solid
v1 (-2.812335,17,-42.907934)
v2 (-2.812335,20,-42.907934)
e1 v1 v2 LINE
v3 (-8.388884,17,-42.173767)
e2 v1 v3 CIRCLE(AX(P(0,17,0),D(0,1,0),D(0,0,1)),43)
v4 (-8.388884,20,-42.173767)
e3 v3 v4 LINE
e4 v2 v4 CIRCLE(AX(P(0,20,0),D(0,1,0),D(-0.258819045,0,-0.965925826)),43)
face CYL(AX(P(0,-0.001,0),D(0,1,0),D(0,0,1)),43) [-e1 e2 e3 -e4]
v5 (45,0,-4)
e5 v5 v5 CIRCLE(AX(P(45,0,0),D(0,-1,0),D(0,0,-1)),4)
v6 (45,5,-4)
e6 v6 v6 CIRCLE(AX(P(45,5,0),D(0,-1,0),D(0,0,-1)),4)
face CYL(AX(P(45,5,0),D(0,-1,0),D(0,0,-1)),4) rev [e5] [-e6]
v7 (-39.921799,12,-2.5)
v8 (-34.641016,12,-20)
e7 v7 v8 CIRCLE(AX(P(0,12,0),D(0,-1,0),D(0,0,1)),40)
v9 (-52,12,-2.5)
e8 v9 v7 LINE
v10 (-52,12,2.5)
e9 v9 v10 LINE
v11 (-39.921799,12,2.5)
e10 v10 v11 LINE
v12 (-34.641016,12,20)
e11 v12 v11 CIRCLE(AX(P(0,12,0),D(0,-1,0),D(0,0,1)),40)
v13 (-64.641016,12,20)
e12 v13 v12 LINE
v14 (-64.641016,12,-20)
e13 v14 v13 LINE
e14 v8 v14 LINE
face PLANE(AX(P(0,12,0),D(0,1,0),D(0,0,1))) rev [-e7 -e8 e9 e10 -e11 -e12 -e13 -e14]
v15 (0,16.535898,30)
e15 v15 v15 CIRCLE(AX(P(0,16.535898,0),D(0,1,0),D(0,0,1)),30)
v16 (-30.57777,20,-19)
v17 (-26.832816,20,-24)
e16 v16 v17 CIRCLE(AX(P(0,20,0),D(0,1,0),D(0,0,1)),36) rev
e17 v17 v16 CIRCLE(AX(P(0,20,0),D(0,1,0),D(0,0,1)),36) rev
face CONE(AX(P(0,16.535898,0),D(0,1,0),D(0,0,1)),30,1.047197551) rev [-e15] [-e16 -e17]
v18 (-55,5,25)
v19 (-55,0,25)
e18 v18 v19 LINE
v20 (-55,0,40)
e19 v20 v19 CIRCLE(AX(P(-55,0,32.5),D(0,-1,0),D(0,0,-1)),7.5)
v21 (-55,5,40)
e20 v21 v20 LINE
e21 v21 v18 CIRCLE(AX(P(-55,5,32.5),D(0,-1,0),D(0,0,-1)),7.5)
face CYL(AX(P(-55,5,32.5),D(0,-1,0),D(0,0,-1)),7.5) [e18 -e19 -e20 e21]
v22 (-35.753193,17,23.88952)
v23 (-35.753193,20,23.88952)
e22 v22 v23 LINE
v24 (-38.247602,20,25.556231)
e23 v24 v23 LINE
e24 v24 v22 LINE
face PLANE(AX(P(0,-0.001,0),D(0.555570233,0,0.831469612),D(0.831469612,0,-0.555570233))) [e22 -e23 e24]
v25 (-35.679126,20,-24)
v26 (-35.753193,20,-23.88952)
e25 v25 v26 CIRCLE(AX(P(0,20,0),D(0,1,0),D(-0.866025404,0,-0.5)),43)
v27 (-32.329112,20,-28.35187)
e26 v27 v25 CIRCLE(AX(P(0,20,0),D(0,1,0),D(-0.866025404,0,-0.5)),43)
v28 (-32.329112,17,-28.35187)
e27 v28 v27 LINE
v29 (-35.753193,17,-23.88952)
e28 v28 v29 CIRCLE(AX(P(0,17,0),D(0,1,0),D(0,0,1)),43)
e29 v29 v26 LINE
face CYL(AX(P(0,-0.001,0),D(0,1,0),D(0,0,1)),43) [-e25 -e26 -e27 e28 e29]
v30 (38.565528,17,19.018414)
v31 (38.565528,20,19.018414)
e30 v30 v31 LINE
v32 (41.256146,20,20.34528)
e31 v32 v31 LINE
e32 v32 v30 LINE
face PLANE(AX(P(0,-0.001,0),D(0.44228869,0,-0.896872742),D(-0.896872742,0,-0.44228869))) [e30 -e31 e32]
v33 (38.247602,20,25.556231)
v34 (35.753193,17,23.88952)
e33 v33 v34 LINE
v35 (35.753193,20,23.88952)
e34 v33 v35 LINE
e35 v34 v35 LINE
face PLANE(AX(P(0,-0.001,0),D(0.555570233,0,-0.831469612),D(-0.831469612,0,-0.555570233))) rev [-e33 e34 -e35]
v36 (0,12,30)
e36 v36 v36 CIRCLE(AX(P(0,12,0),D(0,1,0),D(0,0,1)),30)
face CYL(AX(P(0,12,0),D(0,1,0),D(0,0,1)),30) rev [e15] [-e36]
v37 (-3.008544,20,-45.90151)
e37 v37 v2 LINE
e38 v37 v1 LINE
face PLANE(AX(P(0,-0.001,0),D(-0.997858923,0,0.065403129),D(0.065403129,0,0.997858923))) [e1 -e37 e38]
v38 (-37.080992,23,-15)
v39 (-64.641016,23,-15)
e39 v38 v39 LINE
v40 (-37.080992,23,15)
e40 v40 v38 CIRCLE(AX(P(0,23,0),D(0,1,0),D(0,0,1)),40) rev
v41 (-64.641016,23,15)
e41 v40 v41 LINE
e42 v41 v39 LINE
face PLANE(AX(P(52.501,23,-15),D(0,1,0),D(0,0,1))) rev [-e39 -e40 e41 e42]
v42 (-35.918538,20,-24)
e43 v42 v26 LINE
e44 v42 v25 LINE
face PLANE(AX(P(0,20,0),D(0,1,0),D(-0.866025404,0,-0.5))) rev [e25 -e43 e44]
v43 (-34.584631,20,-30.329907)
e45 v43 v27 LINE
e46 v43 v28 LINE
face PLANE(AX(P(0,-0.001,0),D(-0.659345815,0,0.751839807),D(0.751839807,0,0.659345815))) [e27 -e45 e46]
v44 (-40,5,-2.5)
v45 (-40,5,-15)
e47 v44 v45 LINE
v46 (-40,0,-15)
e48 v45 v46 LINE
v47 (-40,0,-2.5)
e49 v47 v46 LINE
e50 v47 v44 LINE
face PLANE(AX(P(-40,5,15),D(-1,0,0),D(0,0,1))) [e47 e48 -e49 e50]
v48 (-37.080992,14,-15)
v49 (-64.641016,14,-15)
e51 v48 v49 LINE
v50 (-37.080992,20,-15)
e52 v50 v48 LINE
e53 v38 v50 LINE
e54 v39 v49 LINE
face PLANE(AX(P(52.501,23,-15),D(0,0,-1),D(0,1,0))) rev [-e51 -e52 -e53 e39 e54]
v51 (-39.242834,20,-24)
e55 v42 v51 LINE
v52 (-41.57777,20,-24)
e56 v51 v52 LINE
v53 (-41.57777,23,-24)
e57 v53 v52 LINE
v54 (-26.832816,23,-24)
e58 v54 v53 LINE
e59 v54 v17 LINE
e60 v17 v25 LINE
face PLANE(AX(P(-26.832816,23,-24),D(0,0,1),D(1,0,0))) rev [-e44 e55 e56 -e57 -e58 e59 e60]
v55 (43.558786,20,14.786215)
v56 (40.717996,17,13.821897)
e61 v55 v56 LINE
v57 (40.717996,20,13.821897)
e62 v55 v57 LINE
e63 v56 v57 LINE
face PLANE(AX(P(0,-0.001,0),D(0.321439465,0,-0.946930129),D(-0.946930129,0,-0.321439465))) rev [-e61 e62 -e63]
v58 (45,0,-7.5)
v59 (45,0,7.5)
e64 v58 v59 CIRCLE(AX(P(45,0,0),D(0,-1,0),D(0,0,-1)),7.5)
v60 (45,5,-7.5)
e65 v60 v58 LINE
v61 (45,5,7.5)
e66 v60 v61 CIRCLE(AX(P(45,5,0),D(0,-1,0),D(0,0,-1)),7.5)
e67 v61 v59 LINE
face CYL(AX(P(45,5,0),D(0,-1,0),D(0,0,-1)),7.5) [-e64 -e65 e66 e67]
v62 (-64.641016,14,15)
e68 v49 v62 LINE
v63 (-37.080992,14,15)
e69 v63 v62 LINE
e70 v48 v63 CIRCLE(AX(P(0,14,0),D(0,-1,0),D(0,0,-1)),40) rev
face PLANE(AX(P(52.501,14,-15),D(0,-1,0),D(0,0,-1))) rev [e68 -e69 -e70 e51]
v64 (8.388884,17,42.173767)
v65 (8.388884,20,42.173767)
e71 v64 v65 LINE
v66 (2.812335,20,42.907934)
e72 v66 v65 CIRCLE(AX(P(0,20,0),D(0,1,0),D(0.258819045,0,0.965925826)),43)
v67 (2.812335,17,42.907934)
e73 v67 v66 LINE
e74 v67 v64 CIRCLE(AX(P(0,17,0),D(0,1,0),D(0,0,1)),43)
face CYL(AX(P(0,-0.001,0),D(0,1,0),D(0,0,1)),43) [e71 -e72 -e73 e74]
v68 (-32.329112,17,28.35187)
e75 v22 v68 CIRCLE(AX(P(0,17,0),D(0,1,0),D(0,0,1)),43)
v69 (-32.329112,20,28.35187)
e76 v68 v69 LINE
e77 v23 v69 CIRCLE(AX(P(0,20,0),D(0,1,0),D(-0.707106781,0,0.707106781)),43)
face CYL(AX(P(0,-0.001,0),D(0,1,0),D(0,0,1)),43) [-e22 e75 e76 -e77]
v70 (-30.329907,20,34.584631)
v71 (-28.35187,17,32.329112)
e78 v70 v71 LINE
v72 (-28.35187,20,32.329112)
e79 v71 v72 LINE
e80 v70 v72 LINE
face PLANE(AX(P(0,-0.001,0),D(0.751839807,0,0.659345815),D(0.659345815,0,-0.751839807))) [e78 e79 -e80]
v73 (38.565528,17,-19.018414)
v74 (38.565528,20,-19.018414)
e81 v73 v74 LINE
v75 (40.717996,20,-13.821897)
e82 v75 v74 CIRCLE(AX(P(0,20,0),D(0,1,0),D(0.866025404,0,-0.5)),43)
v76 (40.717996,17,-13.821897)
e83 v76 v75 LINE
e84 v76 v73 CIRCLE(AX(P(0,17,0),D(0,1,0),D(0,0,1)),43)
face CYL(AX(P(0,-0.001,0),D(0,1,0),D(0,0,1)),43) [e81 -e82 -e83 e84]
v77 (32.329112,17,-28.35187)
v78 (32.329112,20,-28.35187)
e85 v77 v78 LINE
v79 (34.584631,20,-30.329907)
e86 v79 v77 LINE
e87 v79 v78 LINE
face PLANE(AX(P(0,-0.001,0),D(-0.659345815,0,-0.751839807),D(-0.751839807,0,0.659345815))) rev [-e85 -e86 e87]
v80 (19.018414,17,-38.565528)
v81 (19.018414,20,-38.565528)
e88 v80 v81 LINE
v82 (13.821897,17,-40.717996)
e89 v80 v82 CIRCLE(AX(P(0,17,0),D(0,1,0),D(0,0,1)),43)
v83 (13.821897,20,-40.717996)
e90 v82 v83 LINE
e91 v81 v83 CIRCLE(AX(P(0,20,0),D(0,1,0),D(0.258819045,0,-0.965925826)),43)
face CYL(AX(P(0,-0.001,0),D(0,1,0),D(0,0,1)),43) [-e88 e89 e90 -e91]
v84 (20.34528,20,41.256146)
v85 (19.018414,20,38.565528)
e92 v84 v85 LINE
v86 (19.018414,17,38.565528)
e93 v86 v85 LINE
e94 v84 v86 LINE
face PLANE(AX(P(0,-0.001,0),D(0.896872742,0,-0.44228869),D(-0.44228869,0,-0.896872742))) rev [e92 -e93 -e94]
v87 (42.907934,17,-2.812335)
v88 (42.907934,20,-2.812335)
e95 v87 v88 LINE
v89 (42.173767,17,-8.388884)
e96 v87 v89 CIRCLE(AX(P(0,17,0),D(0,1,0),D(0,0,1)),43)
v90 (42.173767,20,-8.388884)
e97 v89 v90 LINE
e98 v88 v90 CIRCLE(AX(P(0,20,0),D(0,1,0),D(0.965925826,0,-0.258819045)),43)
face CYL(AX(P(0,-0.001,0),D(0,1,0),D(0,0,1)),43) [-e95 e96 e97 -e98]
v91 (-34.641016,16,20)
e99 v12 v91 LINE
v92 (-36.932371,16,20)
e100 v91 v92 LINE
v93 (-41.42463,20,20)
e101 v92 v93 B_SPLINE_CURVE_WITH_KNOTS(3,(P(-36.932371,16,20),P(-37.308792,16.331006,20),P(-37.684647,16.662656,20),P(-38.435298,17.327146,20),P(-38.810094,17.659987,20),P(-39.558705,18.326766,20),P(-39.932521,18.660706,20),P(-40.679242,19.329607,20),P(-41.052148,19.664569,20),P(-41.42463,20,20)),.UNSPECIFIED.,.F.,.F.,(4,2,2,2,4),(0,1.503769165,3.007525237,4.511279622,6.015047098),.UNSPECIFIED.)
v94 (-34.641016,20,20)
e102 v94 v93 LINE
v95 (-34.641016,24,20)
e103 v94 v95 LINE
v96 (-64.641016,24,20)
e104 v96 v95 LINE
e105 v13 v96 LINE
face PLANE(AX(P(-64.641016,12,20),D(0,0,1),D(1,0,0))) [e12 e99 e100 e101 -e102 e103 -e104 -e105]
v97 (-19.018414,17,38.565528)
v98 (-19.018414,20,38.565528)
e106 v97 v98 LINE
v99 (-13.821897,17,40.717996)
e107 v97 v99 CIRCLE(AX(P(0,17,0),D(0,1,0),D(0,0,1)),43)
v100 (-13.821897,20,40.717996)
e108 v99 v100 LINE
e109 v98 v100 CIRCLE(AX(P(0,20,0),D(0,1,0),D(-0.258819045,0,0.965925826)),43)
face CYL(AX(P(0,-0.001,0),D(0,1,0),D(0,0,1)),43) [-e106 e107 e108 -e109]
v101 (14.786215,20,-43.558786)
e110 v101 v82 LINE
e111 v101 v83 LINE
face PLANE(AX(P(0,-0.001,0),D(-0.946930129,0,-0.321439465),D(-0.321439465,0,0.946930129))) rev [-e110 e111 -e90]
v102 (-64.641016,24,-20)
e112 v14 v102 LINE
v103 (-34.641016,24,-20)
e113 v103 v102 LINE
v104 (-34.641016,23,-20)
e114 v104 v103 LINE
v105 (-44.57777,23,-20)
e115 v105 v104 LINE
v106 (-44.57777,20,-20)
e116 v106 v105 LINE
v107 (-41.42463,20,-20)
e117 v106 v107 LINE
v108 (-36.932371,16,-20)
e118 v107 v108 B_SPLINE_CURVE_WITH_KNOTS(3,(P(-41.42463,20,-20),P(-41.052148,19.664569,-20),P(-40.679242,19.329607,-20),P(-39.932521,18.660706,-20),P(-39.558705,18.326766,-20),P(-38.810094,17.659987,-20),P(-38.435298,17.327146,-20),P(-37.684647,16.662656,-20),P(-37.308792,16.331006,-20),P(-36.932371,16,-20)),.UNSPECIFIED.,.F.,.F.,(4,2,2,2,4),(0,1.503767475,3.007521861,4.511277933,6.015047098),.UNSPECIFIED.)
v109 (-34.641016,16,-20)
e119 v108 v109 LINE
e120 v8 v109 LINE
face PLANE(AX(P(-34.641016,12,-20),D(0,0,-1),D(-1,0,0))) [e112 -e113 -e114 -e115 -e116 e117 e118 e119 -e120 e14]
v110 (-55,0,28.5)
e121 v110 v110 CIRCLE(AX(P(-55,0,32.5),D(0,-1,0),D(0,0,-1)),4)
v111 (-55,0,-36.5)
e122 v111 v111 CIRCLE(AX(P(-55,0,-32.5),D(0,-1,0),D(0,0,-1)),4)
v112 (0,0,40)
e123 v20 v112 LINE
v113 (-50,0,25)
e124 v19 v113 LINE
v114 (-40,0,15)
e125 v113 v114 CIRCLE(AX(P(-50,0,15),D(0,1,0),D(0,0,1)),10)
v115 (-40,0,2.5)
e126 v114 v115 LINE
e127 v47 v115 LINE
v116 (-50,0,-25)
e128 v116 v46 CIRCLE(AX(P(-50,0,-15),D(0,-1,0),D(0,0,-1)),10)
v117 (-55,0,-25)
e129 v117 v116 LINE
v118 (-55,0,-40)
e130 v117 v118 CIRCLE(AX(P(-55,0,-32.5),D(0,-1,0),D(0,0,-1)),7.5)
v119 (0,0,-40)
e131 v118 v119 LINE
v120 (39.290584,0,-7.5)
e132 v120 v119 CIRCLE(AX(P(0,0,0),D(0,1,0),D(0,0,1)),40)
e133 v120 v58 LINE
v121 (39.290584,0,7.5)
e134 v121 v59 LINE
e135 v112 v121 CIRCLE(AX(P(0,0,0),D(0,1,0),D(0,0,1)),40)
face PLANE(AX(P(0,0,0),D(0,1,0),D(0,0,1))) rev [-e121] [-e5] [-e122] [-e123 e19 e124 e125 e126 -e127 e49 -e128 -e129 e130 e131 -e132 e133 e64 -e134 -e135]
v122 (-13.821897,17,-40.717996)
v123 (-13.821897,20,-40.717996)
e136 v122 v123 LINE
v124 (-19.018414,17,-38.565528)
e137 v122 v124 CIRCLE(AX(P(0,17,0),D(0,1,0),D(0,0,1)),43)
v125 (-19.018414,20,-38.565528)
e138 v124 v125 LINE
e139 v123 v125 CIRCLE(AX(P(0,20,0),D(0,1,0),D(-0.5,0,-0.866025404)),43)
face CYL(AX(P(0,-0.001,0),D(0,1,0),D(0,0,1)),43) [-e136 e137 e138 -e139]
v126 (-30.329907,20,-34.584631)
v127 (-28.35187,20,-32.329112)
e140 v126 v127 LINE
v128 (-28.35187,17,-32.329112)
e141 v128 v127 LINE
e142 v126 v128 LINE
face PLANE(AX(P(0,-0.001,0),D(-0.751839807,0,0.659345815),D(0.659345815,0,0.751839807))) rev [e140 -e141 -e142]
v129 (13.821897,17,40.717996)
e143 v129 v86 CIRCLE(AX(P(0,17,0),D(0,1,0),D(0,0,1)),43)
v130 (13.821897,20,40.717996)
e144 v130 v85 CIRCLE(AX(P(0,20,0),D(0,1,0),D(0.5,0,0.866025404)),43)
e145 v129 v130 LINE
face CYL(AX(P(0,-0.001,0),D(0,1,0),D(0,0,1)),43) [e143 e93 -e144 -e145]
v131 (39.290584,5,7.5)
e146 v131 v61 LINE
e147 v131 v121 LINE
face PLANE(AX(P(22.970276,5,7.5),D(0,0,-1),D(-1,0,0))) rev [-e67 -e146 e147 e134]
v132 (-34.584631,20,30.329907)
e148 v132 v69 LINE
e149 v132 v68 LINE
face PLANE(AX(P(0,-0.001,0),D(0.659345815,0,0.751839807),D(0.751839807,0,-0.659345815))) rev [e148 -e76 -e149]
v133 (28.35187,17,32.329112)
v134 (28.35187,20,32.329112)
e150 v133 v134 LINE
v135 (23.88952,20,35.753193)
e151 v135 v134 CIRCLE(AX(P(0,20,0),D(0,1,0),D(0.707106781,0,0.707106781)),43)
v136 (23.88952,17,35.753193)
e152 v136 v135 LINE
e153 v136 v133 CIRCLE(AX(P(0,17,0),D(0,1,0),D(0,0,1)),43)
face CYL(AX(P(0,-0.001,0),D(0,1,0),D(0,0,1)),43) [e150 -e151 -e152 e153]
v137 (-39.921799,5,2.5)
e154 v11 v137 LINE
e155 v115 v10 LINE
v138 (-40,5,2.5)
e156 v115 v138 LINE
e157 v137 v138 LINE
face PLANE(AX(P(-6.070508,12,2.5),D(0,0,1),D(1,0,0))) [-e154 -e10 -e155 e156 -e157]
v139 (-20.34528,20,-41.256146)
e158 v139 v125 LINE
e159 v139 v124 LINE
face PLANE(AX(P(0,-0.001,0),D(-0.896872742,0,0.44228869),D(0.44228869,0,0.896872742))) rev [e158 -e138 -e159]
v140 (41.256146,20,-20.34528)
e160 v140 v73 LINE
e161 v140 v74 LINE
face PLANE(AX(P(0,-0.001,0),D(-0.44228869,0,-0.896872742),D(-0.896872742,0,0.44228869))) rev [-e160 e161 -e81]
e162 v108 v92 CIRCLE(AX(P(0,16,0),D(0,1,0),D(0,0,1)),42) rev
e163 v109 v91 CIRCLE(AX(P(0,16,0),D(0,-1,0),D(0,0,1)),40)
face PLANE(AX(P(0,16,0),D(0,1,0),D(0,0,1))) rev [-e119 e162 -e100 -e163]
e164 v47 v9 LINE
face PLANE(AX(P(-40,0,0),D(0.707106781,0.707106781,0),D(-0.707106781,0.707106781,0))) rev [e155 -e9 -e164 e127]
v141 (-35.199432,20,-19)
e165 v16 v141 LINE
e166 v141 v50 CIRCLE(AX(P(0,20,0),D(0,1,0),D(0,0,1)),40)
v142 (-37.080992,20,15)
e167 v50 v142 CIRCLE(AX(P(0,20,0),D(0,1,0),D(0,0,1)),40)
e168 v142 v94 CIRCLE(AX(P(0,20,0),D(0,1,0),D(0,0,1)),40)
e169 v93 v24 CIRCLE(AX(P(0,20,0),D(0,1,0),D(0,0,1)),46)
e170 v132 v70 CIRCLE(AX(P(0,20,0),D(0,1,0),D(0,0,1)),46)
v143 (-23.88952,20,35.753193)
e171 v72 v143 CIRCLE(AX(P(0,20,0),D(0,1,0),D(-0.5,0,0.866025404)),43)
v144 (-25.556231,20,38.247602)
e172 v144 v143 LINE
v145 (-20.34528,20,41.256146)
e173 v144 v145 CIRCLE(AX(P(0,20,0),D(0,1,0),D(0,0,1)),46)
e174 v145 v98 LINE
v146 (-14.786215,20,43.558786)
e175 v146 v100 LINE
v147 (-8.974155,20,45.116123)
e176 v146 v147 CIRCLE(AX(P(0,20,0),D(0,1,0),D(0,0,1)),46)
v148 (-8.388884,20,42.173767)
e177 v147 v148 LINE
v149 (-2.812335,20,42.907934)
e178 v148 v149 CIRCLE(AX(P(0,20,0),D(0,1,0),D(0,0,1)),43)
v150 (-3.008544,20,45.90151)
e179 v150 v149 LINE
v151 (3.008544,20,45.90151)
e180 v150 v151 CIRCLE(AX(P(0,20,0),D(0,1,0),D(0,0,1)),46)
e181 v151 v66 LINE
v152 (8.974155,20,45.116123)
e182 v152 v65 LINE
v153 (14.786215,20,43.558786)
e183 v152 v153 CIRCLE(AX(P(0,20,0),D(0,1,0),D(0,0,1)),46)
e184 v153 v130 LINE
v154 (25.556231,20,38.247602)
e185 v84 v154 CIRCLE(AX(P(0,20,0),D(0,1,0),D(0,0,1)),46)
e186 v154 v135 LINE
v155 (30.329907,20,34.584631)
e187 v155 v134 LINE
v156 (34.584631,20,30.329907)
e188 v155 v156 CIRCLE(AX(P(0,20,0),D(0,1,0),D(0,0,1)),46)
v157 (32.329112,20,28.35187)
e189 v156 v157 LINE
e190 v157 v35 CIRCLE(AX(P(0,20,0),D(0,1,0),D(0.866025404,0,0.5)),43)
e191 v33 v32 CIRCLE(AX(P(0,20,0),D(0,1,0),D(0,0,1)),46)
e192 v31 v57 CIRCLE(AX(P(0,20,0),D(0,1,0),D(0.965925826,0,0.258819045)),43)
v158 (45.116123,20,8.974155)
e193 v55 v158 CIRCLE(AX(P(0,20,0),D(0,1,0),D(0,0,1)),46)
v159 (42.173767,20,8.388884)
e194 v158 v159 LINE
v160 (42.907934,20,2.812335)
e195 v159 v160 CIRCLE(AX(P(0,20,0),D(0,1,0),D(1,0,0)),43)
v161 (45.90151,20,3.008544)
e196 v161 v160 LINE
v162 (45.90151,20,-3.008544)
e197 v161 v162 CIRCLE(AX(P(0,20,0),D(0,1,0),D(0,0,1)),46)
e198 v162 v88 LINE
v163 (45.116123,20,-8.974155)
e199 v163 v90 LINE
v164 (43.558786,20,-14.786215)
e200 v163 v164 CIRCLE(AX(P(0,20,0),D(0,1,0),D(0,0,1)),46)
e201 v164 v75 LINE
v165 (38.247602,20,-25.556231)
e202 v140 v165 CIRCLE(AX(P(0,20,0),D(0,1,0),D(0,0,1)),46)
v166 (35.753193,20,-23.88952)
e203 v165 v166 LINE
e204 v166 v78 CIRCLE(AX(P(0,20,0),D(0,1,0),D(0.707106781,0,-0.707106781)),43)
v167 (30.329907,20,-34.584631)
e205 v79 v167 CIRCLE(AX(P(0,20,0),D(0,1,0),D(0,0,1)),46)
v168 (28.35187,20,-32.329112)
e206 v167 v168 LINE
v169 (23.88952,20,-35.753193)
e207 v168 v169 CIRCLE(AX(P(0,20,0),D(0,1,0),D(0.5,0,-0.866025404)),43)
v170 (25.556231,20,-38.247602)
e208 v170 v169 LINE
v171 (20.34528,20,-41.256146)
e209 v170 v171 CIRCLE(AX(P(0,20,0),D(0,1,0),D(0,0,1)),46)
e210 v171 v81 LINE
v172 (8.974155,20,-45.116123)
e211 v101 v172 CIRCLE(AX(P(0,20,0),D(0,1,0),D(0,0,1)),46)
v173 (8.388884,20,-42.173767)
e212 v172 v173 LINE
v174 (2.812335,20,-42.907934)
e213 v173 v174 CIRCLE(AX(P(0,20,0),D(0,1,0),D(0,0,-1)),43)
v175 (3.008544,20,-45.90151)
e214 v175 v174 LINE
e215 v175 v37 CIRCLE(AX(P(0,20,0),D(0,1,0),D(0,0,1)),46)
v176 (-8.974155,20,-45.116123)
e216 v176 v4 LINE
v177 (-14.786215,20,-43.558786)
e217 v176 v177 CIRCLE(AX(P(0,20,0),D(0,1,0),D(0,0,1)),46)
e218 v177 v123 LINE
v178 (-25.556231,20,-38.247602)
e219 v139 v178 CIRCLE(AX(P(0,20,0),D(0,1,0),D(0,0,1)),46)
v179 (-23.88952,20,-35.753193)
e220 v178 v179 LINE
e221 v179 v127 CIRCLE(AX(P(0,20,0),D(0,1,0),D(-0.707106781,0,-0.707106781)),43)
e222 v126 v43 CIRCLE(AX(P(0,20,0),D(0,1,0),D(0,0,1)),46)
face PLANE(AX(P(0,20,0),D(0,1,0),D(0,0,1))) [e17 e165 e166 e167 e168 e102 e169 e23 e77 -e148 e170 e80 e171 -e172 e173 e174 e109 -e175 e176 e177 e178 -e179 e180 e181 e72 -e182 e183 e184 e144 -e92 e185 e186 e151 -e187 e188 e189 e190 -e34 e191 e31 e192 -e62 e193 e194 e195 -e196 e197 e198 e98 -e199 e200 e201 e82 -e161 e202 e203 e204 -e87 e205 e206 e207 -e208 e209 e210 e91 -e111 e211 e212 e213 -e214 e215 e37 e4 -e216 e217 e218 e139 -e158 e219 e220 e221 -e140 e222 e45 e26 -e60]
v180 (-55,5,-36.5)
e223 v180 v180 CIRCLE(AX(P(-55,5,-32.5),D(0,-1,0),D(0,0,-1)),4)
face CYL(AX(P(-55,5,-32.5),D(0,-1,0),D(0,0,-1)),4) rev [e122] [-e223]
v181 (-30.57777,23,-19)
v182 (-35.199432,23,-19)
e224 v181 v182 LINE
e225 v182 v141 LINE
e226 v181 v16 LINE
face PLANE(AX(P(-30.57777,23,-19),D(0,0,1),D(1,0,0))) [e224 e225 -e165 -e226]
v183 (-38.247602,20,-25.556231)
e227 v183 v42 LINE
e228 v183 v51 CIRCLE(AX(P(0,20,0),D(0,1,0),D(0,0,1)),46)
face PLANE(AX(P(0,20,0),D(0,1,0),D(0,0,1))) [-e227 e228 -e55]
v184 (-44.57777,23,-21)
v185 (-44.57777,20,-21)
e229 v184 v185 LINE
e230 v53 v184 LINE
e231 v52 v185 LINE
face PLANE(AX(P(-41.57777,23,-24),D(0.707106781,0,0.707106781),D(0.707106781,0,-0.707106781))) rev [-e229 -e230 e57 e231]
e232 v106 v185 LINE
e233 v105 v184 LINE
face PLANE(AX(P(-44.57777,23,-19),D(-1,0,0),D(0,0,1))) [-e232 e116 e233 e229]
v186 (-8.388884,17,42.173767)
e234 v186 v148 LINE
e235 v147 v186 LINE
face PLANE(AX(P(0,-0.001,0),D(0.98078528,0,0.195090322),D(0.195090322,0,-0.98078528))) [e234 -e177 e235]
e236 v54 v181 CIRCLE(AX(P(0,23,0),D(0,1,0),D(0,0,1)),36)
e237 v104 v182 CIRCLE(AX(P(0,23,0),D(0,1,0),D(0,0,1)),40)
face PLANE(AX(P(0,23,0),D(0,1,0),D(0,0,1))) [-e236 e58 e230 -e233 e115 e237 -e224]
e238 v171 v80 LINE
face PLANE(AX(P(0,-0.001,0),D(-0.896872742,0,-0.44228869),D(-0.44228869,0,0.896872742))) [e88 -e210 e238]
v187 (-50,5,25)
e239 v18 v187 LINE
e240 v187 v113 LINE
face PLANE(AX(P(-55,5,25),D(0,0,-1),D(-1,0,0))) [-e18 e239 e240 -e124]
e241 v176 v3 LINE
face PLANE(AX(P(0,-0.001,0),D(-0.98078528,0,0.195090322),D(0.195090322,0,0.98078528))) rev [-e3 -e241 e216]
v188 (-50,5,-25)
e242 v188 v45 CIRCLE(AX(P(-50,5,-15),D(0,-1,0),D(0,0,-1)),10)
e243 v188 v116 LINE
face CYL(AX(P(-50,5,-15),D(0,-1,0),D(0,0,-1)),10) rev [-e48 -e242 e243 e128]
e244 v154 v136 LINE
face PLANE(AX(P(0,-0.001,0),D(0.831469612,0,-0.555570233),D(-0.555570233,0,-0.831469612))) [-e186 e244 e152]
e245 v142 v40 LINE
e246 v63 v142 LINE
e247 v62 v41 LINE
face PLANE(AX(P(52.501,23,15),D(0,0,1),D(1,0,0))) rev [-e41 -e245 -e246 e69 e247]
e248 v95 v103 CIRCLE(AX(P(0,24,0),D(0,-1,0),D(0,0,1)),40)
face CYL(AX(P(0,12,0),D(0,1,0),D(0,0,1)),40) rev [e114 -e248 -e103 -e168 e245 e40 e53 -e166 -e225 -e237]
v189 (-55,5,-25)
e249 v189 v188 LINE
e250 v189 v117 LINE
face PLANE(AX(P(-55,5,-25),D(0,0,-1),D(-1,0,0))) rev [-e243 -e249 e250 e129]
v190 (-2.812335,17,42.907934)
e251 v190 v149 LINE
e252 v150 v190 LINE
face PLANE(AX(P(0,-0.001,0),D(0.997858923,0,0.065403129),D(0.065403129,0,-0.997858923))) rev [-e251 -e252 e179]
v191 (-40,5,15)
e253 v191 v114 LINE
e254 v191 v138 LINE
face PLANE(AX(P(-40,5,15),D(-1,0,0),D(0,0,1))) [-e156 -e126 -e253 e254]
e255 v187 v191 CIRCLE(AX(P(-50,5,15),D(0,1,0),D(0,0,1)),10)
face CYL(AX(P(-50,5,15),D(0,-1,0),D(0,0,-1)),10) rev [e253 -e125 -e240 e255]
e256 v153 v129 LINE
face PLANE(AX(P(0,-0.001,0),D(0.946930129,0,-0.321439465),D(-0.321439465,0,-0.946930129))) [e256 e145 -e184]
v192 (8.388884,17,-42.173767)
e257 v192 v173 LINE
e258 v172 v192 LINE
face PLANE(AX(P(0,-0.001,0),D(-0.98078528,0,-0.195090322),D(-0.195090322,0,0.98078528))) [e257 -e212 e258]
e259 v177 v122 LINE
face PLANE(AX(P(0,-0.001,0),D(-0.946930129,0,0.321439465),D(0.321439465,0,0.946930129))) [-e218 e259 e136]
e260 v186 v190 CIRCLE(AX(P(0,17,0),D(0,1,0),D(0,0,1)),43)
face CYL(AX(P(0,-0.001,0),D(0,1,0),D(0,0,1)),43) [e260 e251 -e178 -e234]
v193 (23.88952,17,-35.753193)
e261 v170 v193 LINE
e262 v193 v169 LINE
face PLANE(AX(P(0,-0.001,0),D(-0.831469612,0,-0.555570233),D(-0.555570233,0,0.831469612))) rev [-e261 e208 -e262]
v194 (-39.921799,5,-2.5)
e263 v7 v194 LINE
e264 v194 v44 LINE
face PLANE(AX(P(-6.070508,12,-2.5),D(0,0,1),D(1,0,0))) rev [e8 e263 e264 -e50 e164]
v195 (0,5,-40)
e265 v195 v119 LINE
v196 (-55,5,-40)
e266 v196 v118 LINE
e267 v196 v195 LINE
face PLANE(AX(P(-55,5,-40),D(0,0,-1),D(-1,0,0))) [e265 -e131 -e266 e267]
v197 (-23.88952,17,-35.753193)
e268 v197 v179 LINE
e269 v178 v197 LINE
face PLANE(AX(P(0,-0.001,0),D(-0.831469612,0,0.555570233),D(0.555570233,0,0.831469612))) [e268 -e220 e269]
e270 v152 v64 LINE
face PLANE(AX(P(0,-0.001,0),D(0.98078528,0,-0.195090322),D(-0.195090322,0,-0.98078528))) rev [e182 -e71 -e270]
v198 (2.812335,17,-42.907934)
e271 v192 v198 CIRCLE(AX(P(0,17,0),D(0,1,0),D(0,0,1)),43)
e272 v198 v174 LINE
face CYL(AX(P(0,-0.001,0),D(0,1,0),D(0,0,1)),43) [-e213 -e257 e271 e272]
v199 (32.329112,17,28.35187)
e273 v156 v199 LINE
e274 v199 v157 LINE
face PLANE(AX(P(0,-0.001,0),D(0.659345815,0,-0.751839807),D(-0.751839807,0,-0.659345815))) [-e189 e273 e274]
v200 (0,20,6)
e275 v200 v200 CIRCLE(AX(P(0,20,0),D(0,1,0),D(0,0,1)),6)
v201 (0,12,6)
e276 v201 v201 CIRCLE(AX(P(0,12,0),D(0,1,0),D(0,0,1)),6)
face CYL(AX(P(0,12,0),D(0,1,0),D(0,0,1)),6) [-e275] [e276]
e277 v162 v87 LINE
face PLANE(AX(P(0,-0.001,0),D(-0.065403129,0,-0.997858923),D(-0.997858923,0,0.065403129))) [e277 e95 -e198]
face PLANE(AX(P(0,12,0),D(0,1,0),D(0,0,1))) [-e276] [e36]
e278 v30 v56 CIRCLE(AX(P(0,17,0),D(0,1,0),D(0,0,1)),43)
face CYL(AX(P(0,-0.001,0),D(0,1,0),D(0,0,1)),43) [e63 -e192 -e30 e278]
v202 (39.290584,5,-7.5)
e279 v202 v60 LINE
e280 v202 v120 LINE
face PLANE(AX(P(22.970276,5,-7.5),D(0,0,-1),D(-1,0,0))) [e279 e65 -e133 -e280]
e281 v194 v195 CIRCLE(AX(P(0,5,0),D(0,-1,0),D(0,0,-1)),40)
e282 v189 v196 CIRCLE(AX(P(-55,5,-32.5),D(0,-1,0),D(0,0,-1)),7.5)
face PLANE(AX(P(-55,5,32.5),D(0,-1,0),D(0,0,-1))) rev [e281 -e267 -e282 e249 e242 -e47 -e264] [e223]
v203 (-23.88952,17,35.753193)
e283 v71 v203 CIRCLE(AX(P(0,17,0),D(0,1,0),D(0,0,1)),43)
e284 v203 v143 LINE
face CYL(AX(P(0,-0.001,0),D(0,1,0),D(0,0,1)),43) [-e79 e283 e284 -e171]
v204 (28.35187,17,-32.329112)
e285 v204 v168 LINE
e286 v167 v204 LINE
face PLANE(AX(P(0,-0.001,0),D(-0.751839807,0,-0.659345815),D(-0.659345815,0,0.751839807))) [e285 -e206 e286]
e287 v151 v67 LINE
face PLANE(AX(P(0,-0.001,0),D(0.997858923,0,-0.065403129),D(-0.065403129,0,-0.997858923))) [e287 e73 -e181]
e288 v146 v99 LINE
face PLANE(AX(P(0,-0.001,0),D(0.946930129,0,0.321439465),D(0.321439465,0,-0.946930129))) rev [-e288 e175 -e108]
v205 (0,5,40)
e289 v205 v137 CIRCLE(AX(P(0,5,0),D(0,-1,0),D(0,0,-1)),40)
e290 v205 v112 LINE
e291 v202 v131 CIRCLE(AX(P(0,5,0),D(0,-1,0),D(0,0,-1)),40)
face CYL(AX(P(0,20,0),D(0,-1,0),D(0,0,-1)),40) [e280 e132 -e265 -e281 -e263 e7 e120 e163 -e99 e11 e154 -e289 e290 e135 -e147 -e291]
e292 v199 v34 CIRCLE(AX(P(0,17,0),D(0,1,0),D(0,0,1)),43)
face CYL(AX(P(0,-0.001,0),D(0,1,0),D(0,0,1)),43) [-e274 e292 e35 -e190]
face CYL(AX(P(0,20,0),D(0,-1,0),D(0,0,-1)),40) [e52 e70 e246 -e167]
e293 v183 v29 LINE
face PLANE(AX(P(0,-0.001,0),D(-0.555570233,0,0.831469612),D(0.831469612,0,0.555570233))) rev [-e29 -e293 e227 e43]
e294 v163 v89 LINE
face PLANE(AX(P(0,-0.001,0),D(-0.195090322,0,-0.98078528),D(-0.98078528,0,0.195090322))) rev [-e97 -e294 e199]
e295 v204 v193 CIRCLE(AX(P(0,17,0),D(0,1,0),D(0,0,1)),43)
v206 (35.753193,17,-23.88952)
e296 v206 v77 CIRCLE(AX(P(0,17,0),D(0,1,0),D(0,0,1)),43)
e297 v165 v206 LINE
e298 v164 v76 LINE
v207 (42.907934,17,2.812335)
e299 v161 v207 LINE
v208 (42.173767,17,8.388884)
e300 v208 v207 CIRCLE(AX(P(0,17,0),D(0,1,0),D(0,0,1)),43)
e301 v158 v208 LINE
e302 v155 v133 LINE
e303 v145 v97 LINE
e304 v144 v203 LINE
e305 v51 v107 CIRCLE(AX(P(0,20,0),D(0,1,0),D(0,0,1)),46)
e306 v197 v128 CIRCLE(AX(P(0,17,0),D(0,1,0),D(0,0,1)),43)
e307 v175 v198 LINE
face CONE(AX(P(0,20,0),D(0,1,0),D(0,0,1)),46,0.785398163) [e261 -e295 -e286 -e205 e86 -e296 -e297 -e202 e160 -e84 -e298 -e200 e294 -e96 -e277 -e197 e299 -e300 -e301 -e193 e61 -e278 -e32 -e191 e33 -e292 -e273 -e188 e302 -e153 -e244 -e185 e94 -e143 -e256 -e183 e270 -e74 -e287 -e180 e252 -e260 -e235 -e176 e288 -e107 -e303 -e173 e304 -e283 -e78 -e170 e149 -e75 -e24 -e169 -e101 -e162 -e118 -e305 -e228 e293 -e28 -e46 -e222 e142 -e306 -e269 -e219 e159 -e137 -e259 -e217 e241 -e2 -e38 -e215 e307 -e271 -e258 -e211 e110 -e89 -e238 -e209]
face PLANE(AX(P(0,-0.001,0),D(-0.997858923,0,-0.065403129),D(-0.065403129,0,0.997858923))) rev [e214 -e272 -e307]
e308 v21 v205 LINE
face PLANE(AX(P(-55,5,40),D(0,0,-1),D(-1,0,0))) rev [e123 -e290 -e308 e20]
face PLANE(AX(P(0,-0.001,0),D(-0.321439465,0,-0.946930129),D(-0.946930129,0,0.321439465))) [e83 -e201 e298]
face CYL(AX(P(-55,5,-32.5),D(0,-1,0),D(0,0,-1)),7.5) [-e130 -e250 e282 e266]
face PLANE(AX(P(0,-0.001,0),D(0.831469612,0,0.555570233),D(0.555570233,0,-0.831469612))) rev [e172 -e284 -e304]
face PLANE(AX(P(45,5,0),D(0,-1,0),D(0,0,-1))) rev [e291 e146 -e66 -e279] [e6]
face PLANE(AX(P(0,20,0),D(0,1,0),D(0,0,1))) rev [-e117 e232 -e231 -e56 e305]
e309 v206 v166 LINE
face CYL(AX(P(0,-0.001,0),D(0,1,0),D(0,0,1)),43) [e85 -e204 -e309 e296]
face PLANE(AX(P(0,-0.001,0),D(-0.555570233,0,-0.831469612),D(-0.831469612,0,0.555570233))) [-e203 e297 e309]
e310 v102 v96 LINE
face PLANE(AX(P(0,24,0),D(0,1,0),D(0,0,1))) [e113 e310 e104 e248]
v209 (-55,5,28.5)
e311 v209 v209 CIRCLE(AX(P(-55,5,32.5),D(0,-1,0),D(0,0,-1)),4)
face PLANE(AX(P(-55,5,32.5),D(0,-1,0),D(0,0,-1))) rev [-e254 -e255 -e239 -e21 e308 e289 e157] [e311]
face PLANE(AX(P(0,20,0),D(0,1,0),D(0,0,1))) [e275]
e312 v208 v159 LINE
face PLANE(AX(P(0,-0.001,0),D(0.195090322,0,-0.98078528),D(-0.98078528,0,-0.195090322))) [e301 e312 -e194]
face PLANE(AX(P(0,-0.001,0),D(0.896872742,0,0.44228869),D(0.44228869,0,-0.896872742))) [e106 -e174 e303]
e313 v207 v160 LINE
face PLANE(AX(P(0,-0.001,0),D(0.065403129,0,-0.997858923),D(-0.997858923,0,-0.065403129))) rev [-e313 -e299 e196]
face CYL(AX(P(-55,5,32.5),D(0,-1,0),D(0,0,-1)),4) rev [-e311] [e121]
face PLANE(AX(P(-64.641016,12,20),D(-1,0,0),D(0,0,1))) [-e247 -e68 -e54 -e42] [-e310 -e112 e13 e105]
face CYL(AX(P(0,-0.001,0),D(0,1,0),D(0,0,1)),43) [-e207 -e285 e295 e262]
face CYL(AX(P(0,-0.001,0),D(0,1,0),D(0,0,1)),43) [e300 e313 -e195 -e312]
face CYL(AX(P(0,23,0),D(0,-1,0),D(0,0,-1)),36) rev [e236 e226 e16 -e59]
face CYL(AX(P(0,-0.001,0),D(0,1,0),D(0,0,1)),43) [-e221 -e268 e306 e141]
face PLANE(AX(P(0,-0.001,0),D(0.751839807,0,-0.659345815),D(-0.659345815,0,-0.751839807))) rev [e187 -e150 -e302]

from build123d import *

# Parameters (mm, degrees)
SKETCH1_R                = 40
BOSS_EXTRUDE1_DEPTH      = 20
SKETCH2_R                = 4
BOSS_EXTRUDE2_DEPTH      = 5
SKETCH3_R                = 30
SKETCH3_R_2              = 6
CUT_EXTRUDE2_DEPTH       = 8
CHAMFER1_SIZE            = 6
CHAMFER1_SIZE2           = 3.464101615
BOSS_EXTRUDE3_DEPTH      = 4
BOSS_EXTRUDE3_DEPTH_BACK = 8
CUT_EXTRUDE3_REACH       = 128.087
CUT_EXTRUDE3_END_RADIUS  = 40
SKETCH7_W                = 30
SKETCH7_H                = 9
RIB1_REACH               = 81.715
SKETCH9_WALL_W           = 178.400308644
SKETCH9_WALL_H           = 5
BOSS_EXTRUDE10_DEPTH     = 3
BOSS_EXTRUDE12_START     = -4
BOSS_EXTRUDE12_DEPTH     = 4
CHAMFER2_SIZE            = 4
CUT_EXTRUDE4_REACH       = 83.82
CIRPATTERN1_START        = 17
CIRPATTERN1_DEPTH        = 3


# Read off the part's stored shape, not the designer's step: CirPattern1
with BuildPart() as part:
    # Sketch1 → Boss-Extrude1 (new body)
    with BuildSketch(Plane(origin=(0, 0, 0), x_dir=(1, 0, 0), z_dir=(0, 1, 0))):
        with Locations(Location((0, 0, 0), (0, 0, 270))):
            Circle(SKETCH1_R)
    extrude(amount=BOSS_EXTRUDE1_DEPTH)

    # Sketch2 → Boss-Extrude2 (add)
    # profile 1 of 2: a face of its own
    with BuildSketch(Plane.XZ):
        with BuildLine():
            Line((-55, 40), (0, 40))
            Line((0, 40), (0, -40))
            Line((0, -40), (-55, -40))
            ThreePointArc((-55, -40), (-62.5, -32.5), (-55, -25))
            Line((-55, -25), (-50, -25))
            ThreePointArc((-50, -25), (-42.928932188, -22.071067812), (-40, -15))
            Line((-40, -15), (-40, 15))
            ThreePointArc((-40, 15), (-42.928932188, 22.071067812), (-50, 25))
            Line((-50, 25), (-55, 25))
            ThreePointArc((-55, 25), (-62.5, 32.5), (-55, 40))
        make_face()
        with Locations(Location((-55, 32.5, 0), (0, 0, 270))):
            Circle(SKETCH2_R, mode=Mode.SUBTRACT)
        with Locations(Location((-55, -32.5, 0), (0, 0, 270))):
            Circle(SKETCH2_R, mode=Mode.SUBTRACT)
    # profile 2 of 2: a face of its own
    with BuildSketch(Plane.XZ):
        with BuildLine():
            Line((22.970276422, 7.5), (45, 7.5))
            ThreePointArc((45, 7.5), (52.5, 0), (45, -7.5))
            Line((45, -7.5), (22.970276422, -7.5))
            Line((22.970276422, -7.5), (22.970276422, 7.5))
        make_face()
        with Locations(Location((45, 0, 0), (0, 0, 270))):
            Circle(SKETCH2_R, mode=Mode.SUBTRACT)
    extrude(amount=-BOSS_EXTRUDE2_DEPTH)

    # Sketch3 → Cut-Extrude2 (cut)
    with BuildSketch(Plane(origin=(0, 20, 0), x_dir=(1, 0, 0), z_dir=(0, 1, 0))):
        with Locations(Location((0, 0, 0), (0, 0, 270))):
            Circle(SKETCH3_R)
        with Locations(Location((0, 0, 0), (0, 0, 270))):
            Circle(SKETCH3_R_2, mode=Mode.SUBTRACT)
    extrude(amount=-CUT_EXTRUDE2_DEPTH, mode=Mode.SUBTRACT)

    # Chamfer1
    chamfer1_edges = [part.edges().sort_by_distance(p)[0] for p in [
        (0, 20, -30),
    ]]
    chamfer1_side = [part.faces().sort_by_distance(p)[0] for p in [
        (0, 20, -38.86862915),
    ]]
    chamfer(chamfer1_edges, length=CHAMFER1_SIZE, length2=CHAMFER1_SIZE2, reference=chamfer1_side[0])

    # Sketch6 → Boss-Extrude3 (add, two sides: drawn at the far end of the back side and taken through both)
    with BuildSketch(Plane(origin=(0, 20, 0), x_dir=(1, 0, 0), z_dir=(0, 1, 0)).offset(-BOSS_EXTRUDE3_DEPTH_BACK)):
        with BuildLine():
            Line((-34.641016151, 20), (-64.641016151, 20))
            Line((-64.641016151, 20), (-64.641016151, -20))
            Line((-64.641016151, -20), (-34.641016151, -20))
            ThreePointArc((-34.641016151, -20), (-40, 0), (-34.641016151, 20))
        make_face()
    extrude(amount=BOSS_EXTRUDE3_DEPTH + BOSS_EXTRUDE3_DEPTH_BACK)

    # Cut-Extrude3: up to this cylinder (the profile starts outside it)
    cut_extrude3_end = Plane(origin=(0, 18.5, 0), z_dir=(0, -1, 0)) * Cylinder(CUT_EXTRUDE3_END_RADIUS, 337.174, mode=Mode.PRIVATE)
    # Sketch7 → Cut-Extrude3 (cut, up to the surface)
    with BuildSketch(Plane.ZY.offset(64.641016151), mode=Mode.PRIVATE) as cut_extrude3_sk1:
        with Locations((0, 18.5)):
            Rectangle(SKETCH7_W, SKETCH7_H)
    cut_extrude3_tool1 = extrude(cut_extrude3_sk1.sketch, amount=-CUT_EXTRUDE3_REACH, mode=Mode.PRIVATE) - cut_extrude3_end
    add(cut_extrude3_tool1.solids().sort_by_distance((-64.641016, 18.5, 0))[0], mode=Mode.SUBTRACT)

    # Sketch9 wall → Rib1 (add, up to next)
    with BuildSketch(Plane(origin=(-46, 6, 0), x_dir=(-0.707106781187, 0.707106781187, 0), z_dir=(-0.707106781187, -0.707106781187, 0)), mode=Mode.PRIVATE) as rib1_sk1:
        Rectangle(SKETCH9_WALL_W, SKETCH9_WALL_H)
    rib1_tool1 = extrude(rib1_sk1.sketch, amount=-RIB1_REACH, mode=Mode.PRIVATE) - part.part
    add(rib1_tool1.solids().sort_by_distance((-46, 6, 0))[0])

    # Sketch13 → Boss-Extrude10 (add)
    with BuildSketch(Plane(origin=(0, 20, 0), x_dir=(1, 0, 0), z_dir=(0, 1, 0))):
        with BuildLine():
            Line((-30.577769703, 19), (-44.577769703, 19))
            Line((-44.577769703, 19), (-44.577769703, 21))
            Line((-44.577769703, 21), (-41.577769703, 24))
            Line((-41.577769703, 24), (-26.83281573, 24))
            ThreePointArc((-26.83281573, 24), (-28.813952001, 21.581384804), (-30.577769703, 19))
        make_face()
    extrude(amount=BOSS_EXTRUDE10_DEPTH)

    # Sketch14 → Boss-Extrude12 (add)
    with BuildSketch(Plane(origin=(0, 20, 0), x_dir=(1, 0, 0), z_dir=(0, 1, 0)).offset(BOSS_EXTRUDE12_START)):
        with BuildLine():
            Line((-34.641016151, 20), (-41.424630354, 20))
            ThreePointArc((-41.424630354, 20), (46, 0), (-41.424630354, -20))
            Line((-41.424630354, -20), (-34.641016151, -20))
            ThreePointArc((-34.641016151, -20), (40, 0), (-34.641016151, 20))
        make_face()
    extrude(amount=BOSS_EXTRUDE12_DEPTH)

    # Chamfer2
    chamfer2_edges = [part.edges().sort_by_distance(p)[0] for p in [
        (46, 16, 0),
    ]]
    chamfer(chamfer2_edges, length=CHAMFER2_SIZE - 0.0001)  # a hair under: the kernel refuses the full size

    # Sketch15 → Cut-Extrude4 (cut, up to next)
    with BuildSketch(Plane(origin=(0, 20, 0), x_dir=(1, 0, 0), z_dir=(0, 1, 0)), mode=Mode.PRIVATE) as cut_extrude4_sk1:
        with BuildLine():
            Line((-8.388883847, -42.173767057), (-8.974154813, -45.116122899))
            ThreePointArc((-8.974154813, -45.116122899), (-6.004204842, -45.606463623), (-3.008543945, -45.901510469))
            Line((-3.008543945, -45.901510469), (-2.812334557, -42.907933699))
            ThreePointArc((-2.812334557, -42.907933699), (-5.612626265, -42.632129039), (-8.388883847, -42.173767057))
        make_face()
    cut_extrude4_tool1 = extrude(cut_extrude4_sk1.sketch, amount=-CUT_EXTRUDE4_REACH, mode=Mode.PRIVATE) & part.part
    add(cut_extrude4_tool1.solids().sort_by_distance((-5.806468, 20, 44.104502))[0], mode=Mode.SUBTRACT)

    # CirPattern1 outline → CirPattern1 (cut)
    with BuildSketch(Plane(origin=(0, 0, 0), x_dir=(1, 0, 0), z_dir=(0, 1, 0)).offset(CIRPATTERN1_START)):
        with BuildLine():
            ThreePointArc((8.388883847, -42.173767057), (5.612626266, -42.632129039), (2.812334557, -42.907933699))
            Line((2.812334557, -42.907933699), (3.008543945, -45.901510469))
            Line((3.008543945, -45.901510469), (3.080542753, -47))
            Line((3.080542753, -47), (9.348881267, -47))
            Line((9.348881267, -47), (8.974154813, -45.116122899))
            Line((8.974154813, -45.116122899), (8.388883847, -42.173767057))
        make_face()
        with BuildLine():
            Line((-23.177835023, -47), (-15.954350166, -47))
            Line((-15.954350166, -47), (-14.786215404, -43.558785957))
            Line((-14.786215404, -43.558785957), (-13.821897008, -40.717995568))
            ThreePointArc((-13.821897008, -40.717995568), (-16.455387592, -39.726819898), (-19.018413679, -38.565527886))
            Line((-19.018413679, -38.565527886), (-20.34527975, -41.256146111))
            Line((-20.34527975, -41.256146111), (-23.177835023, -47))
        make_face()
        with BuildLine():
            Line((14.786215404, -43.558785957), (15.954350166, -47))
            Line((15.954350166, -47), (23.177835023, -47))
            Line((23.177835023, -47), (20.34527975, -41.256146111))
            Line((20.34527975, -41.256146111), (19.018413679, -38.565527886))
            ThreePointArc((19.018413679, -38.565527886), (16.455387592, -39.726819898), (13.821897008, -40.717995568))
            Line((13.821897008, -40.717995568), (14.786215404, -43.558785957))
        make_face()
        with BuildLine():
            Line((-40, -47), (-31.404395982, -47))
            Line((-31.404395982, -47), (-25.556230719, -38.247602166))
            Line((-25.556230719, -38.247602166), (-23.88952002, -35.753193329))
            ThreePointArc((-23.88952002, -35.753193329), (-26.176741447, -34.114193633), (-28.351870049, -32.329111722))
            Line((-28.351870049, -32.329111722), (-30.329907495, -34.584631144))
            Line((-30.329907495, -34.584631144), (-40, -45.61125832))
            Line((-40, -45.61125832), (-40, -47))
        make_face()
        with BuildLine():
            Line((25.556230719, -38.247602166), (31.404395982, -47))
            Line((31.404395982, -47), (41.217893767, -47))
            Line((41.217893767, -47), (30.329907495, -34.584631144))
            Line((30.329907495, -34.584631144), (28.351870049, -32.329111722))
            ThreePointArc((28.351870049, -32.329111722), (26.176741447, -34.114193633), (23.88952002, -35.753193329))
            Line((23.88952002, -35.753193329), (25.556230719, -38.247602166))
        make_face()
        with BuildLine():
            Line((-40, -26.727145517), (-40, -35.079058523))
            Line((-40, -35.079058523), (-34.584631144, -30.329907495))
            Line((-34.584631144, -30.329907495), (-32.329111722, -28.351870049))
            ThreePointArc((-32.329111722, -28.351870049), (-34.114193633, -26.176741447), (-35.753193329, -23.88952002))
            Line((-35.753193329, -23.88952002), (-38.247602166, -25.556230719))
            Line((-38.247602166, -25.556230719), (-40, -26.727145517))
        make_face()
        with BuildLine():
            Line((34.584631144, -30.329907495), (47, -41.217893767))
            Line((47, -41.217893767), (47, -31.404395982))
            Line((47, -31.404395982), (38.247602166, -25.556230719))
            Line((38.247602166, -25.556230719), (35.753193329, -23.88952002))
            ThreePointArc((35.753193329, -23.88952002), (34.114193633, -26.176741447), (32.329111722, -28.351870049))
            Line((32.329111722, -28.351870049), (34.584631144, -30.329907495))
        make_face()
        with BuildLine():
            Line((-40, 35.079058523), (-40, 26.727145517))
            Line((-40, 26.727145517), (-38.247602166, 25.556230719))
            Line((-38.247602166, 25.556230719), (-35.753193329, 23.88952002))
            ThreePointArc((-35.753193329, 23.88952002), (-34.114193633, 26.176741447), (-32.329111722, 28.351870049))
            Line((-32.329111722, 28.351870049), (-34.584631144, 30.329907495))
            Line((-34.584631144, 30.329907495), (-40, 35.079058523))
        make_face()
        with BuildLine():
            Line((41.256146111, -20.34527975), (47, -23.177835023))
            Line((47, -23.177835023), (47, -15.954350166))
            Line((47, -15.954350166), (43.558785957, -14.786215404))
            Line((43.558785957, -14.786215404), (40.717995568, -13.821897008))
            ThreePointArc((40.717995568, -13.821897008), (39.726819898, -16.455387592), (38.565527886, -19.018413679))
            Line((38.565527886, -19.018413679), (41.256146111, -20.34527975))
        make_face()
        with BuildLine():
            Line((-40, 47), (-40, 45.61125832))
            Line((-40, 45.61125832), (-30.329907495, 34.584631144))
            Line((-30.329907495, 34.584631144), (-28.351870049, 32.329111722))
            ThreePointArc((-28.351870049, 32.329111722), (-26.176741447, 34.114193633), (-23.88952002, 35.753193329))
            Line((-23.88952002, 35.753193329), (-25.556230719, 38.247602166))
            Line((-25.556230719, 38.247602166), (-31.404395982, 47))
            Line((-31.404395982, 47), (-40, 47))
        make_face()
        with BuildLine():
            Line((45.116122899, -8.974154813), (47, -9.348881267))
            Line((47, -9.348881267), (47, -3.080542753))
            Line((47, -3.080542753), (45.901510469, -3.008543945))
            Line((45.901510469, -3.008543945), (42.907933699, -2.812334557))
            ThreePointArc((42.907933699, -2.812334557), (42.632129039, -5.612626266), (42.173767057, -8.388883847))
            Line((42.173767057, -8.388883847), (45.116122899, -8.974154813))
        make_face()
        with BuildLine():
            Line((45.901510469, 3.008543945), (47, 3.080542753))
            Line((47, 3.080542753), (47, 9.348881267))
            Line((47, 9.348881267), (45.116122899, 8.974154813))
            Line((45.116122899, 8.974154813), (42.173767057, 8.388883847))
            ThreePointArc((42.173767057, 8.388883847), (42.632129039, 5.612626266), (42.907933699, 2.812334557))
            Line((42.907933699, 2.812334557), (45.901510469, 3.008543945))
        make_face()
        with BuildLine():
            Line((-15.954350166, 47), (-23.177835023, 47))
            Line((-23.177835023, 47), (-20.34527975, 41.256146111))
            Line((-20.34527975, 41.256146111), (-19.018413679, 38.565527886))
            ThreePointArc((-19.018413679, 38.565527886), (-16.455387592, 39.726819898), (-13.821897008, 40.717995568))
            Line((-13.821897008, 40.717995568), (-14.786215404, 43.558785957))
            Line((-14.786215404, 43.558785957), (-15.954350166, 47))
        make_face()
        with BuildLine():
            Line((43.558785957, 14.786215404), (47, 15.954350166))
            Line((47, 15.954350166), (47, 23.177835023))
            Line((47, 23.177835023), (41.256146111, 20.34527975))
            Line((41.256146111, 20.34527975), (38.565527886, 19.018413679))
            ThreePointArc((38.565527886, 19.018413679), (39.726819898, 16.455387592), (40.717995568, 13.821897008))
            Line((40.717995568, 13.821897008), (43.558785957, 14.786215404))
        make_face()
        with BuildLine():
            Line((-3.080542753, 47), (-9.348881267, 47))
            Line((-9.348881267, 47), (-8.974154813, 45.116122899))
            Line((-8.974154813, 45.116122899), (-8.388883847, 42.173767057))
            ThreePointArc((-8.388883847, 42.173767057), (-5.612626266, 42.632129039), (-2.812334557, 42.907933699))
            Line((-2.812334557, 42.907933699), (-3.008543945, 45.901510469))
            Line((-3.008543945, 45.901510469), (-3.080542753, 47))
        make_face()
        with BuildLine():
            Line((38.247602166, 25.556230719), (47, 31.404395982))
            Line((47, 31.404395982), (47, 41.217893767))
            Line((47, 41.217893767), (34.584631144, 30.329907495))
            Line((34.584631144, 30.329907495), (32.329111722, 28.351870049))
            ThreePointArc((32.329111722, 28.351870049), (34.114193633, 26.176741447), (35.753193329, 23.88952002))
            Line((35.753193329, 23.88952002), (38.247602166, 25.556230719))
        make_face()
        with BuildLine():
            Line((9.348881267, 47), (3.080542753, 47))
            Line((3.080542753, 47), (3.008543945, 45.901510469))
            Line((3.008543945, 45.901510469), (2.812334557, 42.907933699))
            ThreePointArc((2.812334557, 42.907933699), (5.612626266, 42.632129039), (8.388883847, 42.173767057))
            Line((8.388883847, 42.173767057), (8.974154813, 45.116122899))
            Line((8.974154813, 45.116122899), (9.348881267, 47))
        make_face()
        with BuildLine():
            Line((23.177835023, 47), (15.954350166, 47))
            Line((15.954350166, 47), (14.786215404, 43.558785957))
            Line((14.786215404, 43.558785957), (13.821897008, 40.717995568))
            ThreePointArc((13.821897008, 40.717995568), (16.455387592, 39.726819898), (19.018413679, 38.565527886))
            Line((19.018413679, 38.565527886), (20.34527975, 41.256146111))
            Line((20.34527975, 41.256146111), (23.177835023, 47))
        make_face()
        with BuildLine():
            Line((30.329907495, 34.584631144), (41.217893767, 47))
            Line((41.217893767, 47), (31.404395982, 47))
            Line((31.404395982, 47), (25.556230719, 38.247602166))
            Line((25.556230719, 38.247602166), (23.88952002, 35.753193329))
            ThreePointArc((23.88952002, 35.753193329), (26.176741447, 34.114193633), (28.351870049, 32.329111722))
            Line((28.351870049, 32.329111722), (30.329907495, 34.584631144))
        make_face()
    extrude(amount=CIRPATTERN1_DEPTH, mode=Mode.SUBTRACT)


solid = part.part
